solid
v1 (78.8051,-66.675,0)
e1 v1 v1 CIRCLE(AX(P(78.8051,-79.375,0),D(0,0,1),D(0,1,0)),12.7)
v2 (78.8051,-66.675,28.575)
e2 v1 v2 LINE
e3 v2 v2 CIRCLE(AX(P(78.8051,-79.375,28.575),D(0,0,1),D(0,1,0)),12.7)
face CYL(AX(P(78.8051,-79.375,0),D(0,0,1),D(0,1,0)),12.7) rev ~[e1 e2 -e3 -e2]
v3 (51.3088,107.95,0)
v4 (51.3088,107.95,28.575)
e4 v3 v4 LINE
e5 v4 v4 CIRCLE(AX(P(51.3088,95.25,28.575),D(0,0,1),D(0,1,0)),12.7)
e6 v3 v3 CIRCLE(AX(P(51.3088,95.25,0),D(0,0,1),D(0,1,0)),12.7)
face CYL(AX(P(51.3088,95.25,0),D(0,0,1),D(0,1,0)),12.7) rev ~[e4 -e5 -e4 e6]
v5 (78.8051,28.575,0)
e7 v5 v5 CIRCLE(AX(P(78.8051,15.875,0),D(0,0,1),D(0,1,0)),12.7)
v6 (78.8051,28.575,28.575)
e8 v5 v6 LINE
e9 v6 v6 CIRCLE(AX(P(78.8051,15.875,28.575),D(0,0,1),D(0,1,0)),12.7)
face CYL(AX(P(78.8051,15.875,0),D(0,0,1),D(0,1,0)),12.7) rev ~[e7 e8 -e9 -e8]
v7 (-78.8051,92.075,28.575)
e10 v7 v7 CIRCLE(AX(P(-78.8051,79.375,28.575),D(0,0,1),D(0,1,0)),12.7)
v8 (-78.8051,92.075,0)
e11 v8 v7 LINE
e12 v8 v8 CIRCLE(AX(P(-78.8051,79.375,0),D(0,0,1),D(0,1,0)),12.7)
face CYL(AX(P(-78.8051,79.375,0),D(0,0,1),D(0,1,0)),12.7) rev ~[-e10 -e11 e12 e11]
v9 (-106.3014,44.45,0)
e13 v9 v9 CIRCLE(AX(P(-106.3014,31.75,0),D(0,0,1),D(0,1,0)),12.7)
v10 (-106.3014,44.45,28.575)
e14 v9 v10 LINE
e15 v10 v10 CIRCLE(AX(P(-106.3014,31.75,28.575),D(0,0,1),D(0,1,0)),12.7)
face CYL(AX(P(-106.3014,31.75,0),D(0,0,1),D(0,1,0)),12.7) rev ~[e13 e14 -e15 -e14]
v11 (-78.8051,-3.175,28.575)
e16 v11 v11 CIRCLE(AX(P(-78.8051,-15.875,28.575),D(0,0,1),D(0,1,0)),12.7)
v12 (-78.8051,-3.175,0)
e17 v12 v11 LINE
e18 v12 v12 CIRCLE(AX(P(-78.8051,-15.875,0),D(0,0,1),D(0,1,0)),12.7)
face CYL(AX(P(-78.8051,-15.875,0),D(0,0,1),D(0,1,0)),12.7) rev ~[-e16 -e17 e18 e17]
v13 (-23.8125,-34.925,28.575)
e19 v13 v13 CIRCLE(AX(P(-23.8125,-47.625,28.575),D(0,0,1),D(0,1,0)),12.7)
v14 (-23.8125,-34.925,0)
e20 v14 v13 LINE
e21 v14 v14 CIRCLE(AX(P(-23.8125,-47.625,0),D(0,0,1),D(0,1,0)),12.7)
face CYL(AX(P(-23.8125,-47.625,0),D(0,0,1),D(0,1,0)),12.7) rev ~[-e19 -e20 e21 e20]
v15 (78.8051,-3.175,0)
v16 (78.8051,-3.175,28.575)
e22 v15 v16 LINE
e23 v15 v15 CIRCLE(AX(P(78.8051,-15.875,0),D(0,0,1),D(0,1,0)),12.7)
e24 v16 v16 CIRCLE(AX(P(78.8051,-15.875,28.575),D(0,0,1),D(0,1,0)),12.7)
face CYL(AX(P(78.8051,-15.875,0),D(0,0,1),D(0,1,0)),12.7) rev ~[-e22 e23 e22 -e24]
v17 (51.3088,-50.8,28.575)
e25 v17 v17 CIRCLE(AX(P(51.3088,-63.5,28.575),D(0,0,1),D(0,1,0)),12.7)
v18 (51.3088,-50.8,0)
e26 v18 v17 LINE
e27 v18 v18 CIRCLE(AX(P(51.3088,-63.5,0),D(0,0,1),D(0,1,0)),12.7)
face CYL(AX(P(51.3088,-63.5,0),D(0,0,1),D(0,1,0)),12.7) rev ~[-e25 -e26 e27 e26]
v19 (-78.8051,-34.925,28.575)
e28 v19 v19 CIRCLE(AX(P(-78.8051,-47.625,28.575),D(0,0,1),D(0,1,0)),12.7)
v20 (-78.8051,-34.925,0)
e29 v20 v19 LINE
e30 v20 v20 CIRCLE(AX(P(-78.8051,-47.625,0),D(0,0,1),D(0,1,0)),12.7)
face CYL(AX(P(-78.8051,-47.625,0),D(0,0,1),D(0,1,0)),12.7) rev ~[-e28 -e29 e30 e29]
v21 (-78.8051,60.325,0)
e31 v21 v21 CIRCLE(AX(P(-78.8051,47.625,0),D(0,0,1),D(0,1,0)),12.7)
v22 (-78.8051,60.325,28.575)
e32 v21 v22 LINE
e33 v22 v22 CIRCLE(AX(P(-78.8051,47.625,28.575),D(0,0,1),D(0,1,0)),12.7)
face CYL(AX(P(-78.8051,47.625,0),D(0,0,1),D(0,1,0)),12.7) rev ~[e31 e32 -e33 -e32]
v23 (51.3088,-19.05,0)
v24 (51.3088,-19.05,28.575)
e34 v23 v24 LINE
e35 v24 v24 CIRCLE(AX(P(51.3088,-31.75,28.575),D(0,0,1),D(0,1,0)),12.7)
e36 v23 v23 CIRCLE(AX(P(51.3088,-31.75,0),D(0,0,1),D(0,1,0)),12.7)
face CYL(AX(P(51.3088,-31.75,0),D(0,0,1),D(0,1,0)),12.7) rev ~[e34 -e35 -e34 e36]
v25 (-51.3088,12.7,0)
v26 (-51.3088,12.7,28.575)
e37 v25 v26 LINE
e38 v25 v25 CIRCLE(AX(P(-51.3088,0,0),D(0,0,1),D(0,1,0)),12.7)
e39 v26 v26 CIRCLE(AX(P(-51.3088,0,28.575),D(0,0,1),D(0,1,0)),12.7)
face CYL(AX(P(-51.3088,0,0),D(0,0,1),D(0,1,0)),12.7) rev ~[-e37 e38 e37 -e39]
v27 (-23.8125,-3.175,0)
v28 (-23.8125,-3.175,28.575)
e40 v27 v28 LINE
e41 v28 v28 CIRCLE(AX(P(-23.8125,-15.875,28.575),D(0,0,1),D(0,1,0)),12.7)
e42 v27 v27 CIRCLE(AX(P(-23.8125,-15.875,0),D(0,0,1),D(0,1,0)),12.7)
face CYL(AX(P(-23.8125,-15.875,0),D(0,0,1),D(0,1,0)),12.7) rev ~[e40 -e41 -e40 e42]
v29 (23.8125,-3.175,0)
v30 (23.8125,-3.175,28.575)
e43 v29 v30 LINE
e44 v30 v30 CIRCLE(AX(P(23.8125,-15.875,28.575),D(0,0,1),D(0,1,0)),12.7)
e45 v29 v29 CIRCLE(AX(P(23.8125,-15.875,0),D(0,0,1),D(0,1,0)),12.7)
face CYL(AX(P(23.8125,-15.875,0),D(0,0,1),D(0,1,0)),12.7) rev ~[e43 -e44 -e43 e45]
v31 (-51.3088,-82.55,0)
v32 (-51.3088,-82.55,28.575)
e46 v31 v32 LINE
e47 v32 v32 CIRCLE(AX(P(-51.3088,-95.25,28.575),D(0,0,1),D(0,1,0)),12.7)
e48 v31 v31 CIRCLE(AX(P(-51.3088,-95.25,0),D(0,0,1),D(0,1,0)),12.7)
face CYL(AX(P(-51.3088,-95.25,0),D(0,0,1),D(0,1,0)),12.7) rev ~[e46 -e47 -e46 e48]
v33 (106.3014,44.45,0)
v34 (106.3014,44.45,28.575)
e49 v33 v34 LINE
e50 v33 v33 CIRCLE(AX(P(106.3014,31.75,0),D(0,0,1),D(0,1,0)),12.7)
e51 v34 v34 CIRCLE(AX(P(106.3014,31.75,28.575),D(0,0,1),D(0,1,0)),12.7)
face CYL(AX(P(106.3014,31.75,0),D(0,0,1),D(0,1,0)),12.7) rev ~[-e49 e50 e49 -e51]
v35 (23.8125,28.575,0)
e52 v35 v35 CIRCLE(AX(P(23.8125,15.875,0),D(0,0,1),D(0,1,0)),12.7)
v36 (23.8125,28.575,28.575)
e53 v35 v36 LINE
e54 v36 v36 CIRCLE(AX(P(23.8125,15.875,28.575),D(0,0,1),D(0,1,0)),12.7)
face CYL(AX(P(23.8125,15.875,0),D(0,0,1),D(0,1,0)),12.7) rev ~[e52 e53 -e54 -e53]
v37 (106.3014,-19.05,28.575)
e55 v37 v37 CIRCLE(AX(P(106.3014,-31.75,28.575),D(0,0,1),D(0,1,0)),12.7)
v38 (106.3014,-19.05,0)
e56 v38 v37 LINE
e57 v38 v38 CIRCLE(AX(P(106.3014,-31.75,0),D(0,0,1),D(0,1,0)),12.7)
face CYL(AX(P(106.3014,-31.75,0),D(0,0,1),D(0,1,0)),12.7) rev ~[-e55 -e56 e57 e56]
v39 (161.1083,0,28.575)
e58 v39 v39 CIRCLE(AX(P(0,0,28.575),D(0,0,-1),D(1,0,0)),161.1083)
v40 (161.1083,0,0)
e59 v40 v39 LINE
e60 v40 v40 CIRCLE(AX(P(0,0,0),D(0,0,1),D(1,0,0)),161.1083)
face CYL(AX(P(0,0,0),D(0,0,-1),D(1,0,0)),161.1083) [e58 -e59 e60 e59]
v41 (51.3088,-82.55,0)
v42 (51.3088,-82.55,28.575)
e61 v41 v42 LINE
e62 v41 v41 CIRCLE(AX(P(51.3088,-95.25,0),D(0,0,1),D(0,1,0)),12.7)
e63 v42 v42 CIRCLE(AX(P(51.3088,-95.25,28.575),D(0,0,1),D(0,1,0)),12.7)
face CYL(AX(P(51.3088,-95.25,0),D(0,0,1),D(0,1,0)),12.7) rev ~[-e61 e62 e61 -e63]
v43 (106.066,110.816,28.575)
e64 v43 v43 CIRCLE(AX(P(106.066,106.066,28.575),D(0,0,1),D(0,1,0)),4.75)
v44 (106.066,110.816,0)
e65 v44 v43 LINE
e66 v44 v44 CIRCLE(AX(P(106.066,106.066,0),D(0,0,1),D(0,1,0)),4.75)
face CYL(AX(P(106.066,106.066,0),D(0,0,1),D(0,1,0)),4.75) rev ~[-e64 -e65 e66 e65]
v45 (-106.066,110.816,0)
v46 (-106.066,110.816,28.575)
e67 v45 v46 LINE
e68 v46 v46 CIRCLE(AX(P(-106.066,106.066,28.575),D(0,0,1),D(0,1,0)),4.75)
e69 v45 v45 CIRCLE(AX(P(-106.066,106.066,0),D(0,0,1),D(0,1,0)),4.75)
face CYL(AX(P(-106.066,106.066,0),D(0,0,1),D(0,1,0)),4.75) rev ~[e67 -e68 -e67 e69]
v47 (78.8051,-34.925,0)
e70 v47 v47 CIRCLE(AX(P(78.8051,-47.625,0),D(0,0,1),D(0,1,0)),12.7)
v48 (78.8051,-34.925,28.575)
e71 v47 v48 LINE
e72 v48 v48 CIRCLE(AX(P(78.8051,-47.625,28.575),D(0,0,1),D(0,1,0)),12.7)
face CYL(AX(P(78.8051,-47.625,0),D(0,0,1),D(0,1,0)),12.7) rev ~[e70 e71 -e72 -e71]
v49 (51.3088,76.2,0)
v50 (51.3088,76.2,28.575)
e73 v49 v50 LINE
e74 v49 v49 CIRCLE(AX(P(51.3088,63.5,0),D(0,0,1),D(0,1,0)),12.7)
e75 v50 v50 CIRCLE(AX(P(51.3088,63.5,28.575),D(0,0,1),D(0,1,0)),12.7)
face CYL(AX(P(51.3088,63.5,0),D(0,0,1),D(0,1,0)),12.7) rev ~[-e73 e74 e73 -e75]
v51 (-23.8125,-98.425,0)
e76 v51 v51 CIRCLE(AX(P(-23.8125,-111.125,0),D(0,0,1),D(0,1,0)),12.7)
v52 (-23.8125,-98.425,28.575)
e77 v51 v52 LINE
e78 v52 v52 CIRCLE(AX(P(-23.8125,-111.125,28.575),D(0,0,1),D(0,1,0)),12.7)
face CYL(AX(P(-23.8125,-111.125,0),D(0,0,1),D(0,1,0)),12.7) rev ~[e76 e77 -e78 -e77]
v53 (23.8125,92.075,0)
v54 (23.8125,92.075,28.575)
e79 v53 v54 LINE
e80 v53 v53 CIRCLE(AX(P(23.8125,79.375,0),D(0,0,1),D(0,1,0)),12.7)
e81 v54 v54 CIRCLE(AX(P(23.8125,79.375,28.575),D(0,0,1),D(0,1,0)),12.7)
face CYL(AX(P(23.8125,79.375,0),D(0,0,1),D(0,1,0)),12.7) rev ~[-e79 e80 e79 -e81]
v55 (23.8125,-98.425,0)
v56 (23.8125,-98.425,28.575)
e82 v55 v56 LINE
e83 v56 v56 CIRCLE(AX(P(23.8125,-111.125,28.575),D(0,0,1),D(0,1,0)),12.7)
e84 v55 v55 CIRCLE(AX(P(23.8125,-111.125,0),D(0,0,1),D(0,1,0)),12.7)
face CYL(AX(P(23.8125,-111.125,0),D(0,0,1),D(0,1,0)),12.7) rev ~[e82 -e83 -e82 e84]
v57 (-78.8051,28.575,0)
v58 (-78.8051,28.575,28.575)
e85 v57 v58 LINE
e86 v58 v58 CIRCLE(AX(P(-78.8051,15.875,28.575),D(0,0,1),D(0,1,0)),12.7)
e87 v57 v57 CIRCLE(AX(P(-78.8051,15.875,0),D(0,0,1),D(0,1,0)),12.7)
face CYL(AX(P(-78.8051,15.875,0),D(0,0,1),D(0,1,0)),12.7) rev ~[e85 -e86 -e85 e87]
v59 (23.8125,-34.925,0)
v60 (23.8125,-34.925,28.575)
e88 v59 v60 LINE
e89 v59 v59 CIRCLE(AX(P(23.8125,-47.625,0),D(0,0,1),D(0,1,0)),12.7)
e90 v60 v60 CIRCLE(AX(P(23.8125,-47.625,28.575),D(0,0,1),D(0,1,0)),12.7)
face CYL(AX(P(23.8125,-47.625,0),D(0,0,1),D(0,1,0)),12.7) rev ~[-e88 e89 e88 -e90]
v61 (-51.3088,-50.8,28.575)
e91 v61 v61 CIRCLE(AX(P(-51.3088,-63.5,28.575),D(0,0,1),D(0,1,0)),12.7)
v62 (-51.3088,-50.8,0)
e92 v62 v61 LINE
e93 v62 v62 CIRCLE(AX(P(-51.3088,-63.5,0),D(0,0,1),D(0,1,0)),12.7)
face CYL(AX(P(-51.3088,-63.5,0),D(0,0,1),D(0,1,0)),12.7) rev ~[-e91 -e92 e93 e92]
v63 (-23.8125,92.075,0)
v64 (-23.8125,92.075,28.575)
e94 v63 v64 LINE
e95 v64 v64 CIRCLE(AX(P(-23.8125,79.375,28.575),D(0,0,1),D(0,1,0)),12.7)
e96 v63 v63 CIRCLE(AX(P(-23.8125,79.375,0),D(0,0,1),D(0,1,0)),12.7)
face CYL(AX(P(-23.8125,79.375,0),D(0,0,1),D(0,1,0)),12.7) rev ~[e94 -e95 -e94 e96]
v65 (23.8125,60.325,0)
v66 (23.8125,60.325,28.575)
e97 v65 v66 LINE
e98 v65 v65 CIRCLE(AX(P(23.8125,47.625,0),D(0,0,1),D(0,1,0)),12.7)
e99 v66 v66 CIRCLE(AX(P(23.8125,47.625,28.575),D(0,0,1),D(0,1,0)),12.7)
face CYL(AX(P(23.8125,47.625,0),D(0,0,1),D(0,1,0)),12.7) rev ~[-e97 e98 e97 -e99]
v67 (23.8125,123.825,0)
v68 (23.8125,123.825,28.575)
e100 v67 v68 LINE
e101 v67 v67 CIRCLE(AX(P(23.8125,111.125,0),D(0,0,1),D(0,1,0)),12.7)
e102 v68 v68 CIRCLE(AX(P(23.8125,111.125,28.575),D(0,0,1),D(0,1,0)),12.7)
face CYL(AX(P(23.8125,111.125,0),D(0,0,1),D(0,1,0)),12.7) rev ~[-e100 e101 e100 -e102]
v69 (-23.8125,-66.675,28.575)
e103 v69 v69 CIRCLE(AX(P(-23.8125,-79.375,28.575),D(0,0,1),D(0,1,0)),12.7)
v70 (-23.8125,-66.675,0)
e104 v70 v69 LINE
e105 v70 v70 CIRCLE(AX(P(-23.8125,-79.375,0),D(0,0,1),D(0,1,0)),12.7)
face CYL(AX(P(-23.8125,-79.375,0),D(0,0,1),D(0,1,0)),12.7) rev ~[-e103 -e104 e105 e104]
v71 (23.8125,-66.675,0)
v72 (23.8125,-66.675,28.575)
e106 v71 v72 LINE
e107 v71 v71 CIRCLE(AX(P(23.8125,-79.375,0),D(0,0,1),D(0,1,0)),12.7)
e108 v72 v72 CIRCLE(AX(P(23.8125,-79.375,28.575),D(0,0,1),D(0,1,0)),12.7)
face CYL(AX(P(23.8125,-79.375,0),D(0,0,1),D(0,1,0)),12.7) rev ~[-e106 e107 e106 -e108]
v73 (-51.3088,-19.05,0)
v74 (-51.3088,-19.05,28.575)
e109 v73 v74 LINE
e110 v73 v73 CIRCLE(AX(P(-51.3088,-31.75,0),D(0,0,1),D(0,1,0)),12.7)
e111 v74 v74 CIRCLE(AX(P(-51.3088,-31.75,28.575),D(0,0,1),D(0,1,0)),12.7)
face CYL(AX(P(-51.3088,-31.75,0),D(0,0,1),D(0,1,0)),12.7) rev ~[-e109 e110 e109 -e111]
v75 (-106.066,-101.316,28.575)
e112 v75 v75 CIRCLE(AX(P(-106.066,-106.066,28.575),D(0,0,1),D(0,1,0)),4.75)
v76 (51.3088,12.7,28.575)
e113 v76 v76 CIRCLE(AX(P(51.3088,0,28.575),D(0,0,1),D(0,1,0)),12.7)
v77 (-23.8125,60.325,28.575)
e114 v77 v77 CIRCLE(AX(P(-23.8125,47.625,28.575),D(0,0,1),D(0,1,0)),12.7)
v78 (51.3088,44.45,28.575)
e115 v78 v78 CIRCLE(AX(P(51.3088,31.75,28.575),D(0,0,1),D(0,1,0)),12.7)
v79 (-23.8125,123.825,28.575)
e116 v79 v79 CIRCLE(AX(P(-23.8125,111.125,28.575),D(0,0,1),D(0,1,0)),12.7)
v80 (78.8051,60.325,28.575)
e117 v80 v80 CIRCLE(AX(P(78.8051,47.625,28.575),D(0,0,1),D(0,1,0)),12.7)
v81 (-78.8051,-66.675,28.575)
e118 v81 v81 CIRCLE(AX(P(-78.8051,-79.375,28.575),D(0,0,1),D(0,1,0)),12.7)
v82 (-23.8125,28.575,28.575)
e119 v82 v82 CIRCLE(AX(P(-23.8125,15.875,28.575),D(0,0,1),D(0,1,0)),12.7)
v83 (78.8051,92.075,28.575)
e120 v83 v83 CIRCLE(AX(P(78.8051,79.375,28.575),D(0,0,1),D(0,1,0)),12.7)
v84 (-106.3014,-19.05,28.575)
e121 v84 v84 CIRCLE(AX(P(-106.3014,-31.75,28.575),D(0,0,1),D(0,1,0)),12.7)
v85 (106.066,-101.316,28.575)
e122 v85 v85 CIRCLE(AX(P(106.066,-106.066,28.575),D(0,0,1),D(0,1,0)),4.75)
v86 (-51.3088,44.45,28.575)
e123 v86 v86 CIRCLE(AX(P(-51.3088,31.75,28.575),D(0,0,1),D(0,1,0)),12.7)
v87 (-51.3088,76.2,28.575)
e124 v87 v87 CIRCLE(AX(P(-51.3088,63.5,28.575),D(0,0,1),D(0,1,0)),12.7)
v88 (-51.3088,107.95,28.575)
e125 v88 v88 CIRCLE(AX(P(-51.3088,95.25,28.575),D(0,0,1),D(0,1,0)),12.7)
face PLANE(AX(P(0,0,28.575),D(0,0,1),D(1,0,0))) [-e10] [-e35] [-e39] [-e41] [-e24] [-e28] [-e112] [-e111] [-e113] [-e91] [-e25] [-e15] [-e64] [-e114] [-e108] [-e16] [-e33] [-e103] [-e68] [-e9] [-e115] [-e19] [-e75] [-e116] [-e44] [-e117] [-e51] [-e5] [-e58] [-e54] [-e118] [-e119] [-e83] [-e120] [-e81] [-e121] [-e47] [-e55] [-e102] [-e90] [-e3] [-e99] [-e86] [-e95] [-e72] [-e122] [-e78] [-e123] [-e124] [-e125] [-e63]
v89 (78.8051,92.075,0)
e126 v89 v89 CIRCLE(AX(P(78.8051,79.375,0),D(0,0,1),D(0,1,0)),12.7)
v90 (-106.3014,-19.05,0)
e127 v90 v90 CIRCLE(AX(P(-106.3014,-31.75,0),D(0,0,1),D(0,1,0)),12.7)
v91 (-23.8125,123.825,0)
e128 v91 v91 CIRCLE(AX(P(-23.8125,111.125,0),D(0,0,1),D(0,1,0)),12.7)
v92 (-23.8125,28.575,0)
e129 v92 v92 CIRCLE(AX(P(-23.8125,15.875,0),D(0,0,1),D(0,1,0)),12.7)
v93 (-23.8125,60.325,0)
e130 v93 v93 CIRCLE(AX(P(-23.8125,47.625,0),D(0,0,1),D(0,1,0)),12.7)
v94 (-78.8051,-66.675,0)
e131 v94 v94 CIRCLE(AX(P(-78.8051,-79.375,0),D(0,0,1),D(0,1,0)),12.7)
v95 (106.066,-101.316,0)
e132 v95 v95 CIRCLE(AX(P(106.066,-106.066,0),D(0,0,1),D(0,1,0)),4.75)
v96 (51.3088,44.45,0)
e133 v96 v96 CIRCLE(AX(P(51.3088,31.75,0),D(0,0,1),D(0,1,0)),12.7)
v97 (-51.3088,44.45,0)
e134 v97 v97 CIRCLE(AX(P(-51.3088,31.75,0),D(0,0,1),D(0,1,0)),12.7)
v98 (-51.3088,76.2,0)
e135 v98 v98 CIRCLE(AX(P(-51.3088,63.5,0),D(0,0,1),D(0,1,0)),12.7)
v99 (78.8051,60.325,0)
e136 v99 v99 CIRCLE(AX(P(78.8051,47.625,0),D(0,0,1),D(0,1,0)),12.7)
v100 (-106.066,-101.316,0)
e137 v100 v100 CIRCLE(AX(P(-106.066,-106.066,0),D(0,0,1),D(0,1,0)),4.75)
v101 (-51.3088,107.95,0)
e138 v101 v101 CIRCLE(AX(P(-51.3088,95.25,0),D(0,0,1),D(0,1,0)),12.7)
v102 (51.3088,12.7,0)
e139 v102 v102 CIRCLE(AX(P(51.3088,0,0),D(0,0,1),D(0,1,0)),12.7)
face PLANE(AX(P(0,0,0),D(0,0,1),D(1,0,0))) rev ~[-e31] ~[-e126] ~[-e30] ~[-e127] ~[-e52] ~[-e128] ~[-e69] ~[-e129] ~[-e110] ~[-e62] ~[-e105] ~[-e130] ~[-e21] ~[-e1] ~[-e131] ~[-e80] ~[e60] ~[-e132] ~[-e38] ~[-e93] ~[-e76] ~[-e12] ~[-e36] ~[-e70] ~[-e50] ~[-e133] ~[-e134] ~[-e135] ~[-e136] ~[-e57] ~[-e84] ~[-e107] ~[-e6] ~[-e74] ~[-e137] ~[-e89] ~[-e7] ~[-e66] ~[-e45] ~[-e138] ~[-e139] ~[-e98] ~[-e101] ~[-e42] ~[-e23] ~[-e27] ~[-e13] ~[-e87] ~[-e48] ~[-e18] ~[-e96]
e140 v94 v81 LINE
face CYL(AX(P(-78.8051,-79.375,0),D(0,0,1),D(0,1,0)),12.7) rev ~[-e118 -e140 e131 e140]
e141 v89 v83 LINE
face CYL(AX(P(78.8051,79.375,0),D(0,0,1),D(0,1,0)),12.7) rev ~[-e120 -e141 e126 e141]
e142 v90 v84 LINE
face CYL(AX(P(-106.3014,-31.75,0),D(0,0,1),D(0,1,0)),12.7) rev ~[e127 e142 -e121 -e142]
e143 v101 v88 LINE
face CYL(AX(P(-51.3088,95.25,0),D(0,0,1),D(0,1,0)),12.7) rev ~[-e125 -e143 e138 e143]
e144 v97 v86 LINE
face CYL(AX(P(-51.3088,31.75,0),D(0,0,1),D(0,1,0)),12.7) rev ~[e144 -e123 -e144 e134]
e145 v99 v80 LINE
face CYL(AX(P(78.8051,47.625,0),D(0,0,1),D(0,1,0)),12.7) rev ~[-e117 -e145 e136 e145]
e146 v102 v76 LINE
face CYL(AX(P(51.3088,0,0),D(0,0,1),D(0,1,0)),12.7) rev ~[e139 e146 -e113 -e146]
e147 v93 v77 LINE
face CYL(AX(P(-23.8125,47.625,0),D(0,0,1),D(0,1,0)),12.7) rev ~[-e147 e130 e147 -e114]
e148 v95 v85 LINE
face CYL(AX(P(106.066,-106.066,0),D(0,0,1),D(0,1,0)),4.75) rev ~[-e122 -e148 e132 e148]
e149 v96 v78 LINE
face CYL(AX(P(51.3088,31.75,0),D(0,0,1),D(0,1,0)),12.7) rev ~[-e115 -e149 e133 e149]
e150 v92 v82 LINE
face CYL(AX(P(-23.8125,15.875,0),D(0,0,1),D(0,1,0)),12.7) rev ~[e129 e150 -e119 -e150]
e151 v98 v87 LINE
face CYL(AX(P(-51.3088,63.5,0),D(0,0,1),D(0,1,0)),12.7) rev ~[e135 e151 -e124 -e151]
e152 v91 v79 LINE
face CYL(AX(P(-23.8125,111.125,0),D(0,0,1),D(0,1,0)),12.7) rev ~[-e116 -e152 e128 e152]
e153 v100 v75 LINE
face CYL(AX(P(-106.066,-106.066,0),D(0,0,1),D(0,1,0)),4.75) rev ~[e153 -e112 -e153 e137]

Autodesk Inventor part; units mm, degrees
ref_plane "YZ Plane" through (0, 0, 0) normal (1, 0, 0) x (0, 1, 0)
ref_plane "XZ Plane" through (0, 0, 0) normal (0, 1, 0) x (-1, 0, 0)
ref_plane "XY Plane" through (0, 0, 0) normal (0, 0, 1) x (1, 0, 0)
sketch "Sketch1" plane through (0, 0, 0) normal (0, 0, 1) x (1, 0, 0)
  circle A0 centre (0, 0) radius 161.1083
  line L0 (4.75, 161.0382) -> (4.75, -161.0382)
  line L1 (-4.75, -161.0382) -> (-4.75, 161.0382)
  line L2 (0, 0) -> (0, 161.1083) construction
  line L3 (23.8125, 79.375) -> (23.8125, 47.625)
  line L4 (23.8125, 47.625) -> (51.3088, 63.5)
  line L5 (51.3088, 63.5) -> (23.8125, 79.375)
  line L6 (23.8125, 111.125) -> (23.8125, 79.375)
  line L7 (23.8125, 79.375) -> (51.3088, 95.25)
  line L8 (51.3088, 95.25) -> (23.8125, 111.125)
  line L9 (23.8125, 47.625) -> (23.8125, 15.875)
  line L10 (23.8125, 15.875) -> (51.3088, 31.75)
  line L11 (51.3088, 31.75) -> (23.8125, 47.625)
  line L12 (23.8125, 15.875) -> (23.8125, -15.875)
  line L13 (23.8125, -15.875) -> (51.3088, 0)
  line L14 (51.3088, 0) -> (23.8125, 15.875)
  line L15 (23.8125, -15.875) -> (23.8125, -47.625)
  line L16 (23.8125, -47.625) -> (51.3088, -31.75)
  line L17 (51.3088, -31.75) -> (23.8125, -15.875)
  line L18 (23.8125, -47.625) -> (23.8125, -79.375)
  line L19 (23.8125, -79.375) -> (51.3088, -63.5)
  line L20 (51.3088, -63.5) -> (23.8125, -47.625)
  line L21 (23.8125, -79.375) -> (23.8125, -111.125)
  line L22 (23.8125, -111.125) -> (51.3088, -95.25)
  line L23 (51.3088, -95.25) -> (23.8125, -79.375)
  line L24 (51.3088, 95.25) -> (78.8051, 79.375)
  line L25 (78.8051, 79.375) -> (51.3088, 63.5)
  line L26 (51.3088, 63.5) -> (78.8051, 47.625)
  line L27 (78.8051, 47.625) -> (51.3088, 31.75)
  line L28 (51.3088, 31.75) -> (78.8051, 15.875)
  line L29 (78.8051, 15.875) -> (51.3088, 0)
  line L30 (51.3088, 0) -> (78.8051, -15.875)
  line L31 (78.8051, -15.875) -> (51.3088, -31.75)
  line L32 (51.3088, -31.75) -> (78.8051, -47.625)
  line L33 (78.8051, -47.625) -> (51.3088, -63.5)
  line L34 (51.3088, -63.5) -> (78.8051, -79.375)
  line L35 (78.8051, -79.375) -> (51.3088, -95.25)
  line L36 (78.8051, -47.625) -> (106.3014, -31.75)
  line L37 (106.3014, -31.75) -> (78.8051, -15.875)
  line L38 (78.8051, -15.875) -> (106.3014, 0)
  line L39 (106.3014, 0) -> (78.8051, 15.875)
  line L40 (78.8051, 15.875) -> (106.3014, 31.75)
  line L41 (106.3014, 31.75) -> (78.8051, 47.625)
  line L42 (0, 0) -> (106.066, 106.066) construction
  point P0 (23.8125, 0)
  point P1 (78.8051, 79.375)
  dimension "d0" = 322.2165
  dimension "d2" = 9.5
  dimension "d3" = 4.75
  dimension "d4" = 31.75
  dimension "d5" = 31.75
  dimension "d6" = 31.75
  dimension "d7" = 31.75
  dimension "d8" = 31.75
  dimension "d9" = 31.75
  dimension "d10" = 31.75
  dimension "d27" = 23.8125
  dimension "d28" = 150
  dimension "d29" = 45
extrude "Extrusion1" add sketch "Sketch1" along normal blind 28.575 contours A0 L0 | L0 A0 L1 | L1 A0 | L5 L4 L3 | L7 L24 L25 L5 | L6 L8 L7 | L11 L10 L9 | L4 L26 L27 L11 | L14 L13 L12 | L10 L28 L29 L14 | L27 L41 L40 L28 | L17 L16 L15 | L13 L30 L31 L17 | L29 L39 L38 L30 | L20 L19 L18 | L16 L32 L33 L20 | L31 L37 L36 L32 | L23 L22 L21 | L19 L34 L35 L23
hole "Hole2" at (23.8125, 47.625, 0) at (51.3088, 63.5, 0) at (23.8125, 111.125, 0) at (23.8125, 79.375, 0) at (51.3088, 95.25, 0) at (51.3088, 31.75, 0) at (23.8125, 15.875, 0) at (23.8125, -15.875, 0) at (51.3088, 0, 0) at (23.8125, -47.625, 0) at (51.3088, -31.75, 0) at (23.8125, -79.375, 0) at (51.3088, -63.5, 0) at (23.8125, -111.125, 0) at (51.3088, -95.25, 0) at (78.8051, 79.375, 0) at (78.8051, 47.625, 0) at (78.8051, 15.875, 0) at (78.8051, -15.875, 0) at (78.8051, -47.625, 0) at (78.8051, -79.375, 0) at (106.3014, -31.75, 0) at (106.3014, 31.75, 0) direction (0, 0, 1) diameter 25.4 end up to surface
mirror "Mirror1" about plane through (0, 0, 0) normal (1, 0, 0) of "Hole2"
hole "Hole3" at (106.066, 106.066, 0) direction (0, 0, 1) diameter 9.5 end up to surface
pattern_circular "Circular Pattern1" count 4 over 360 about axis through (0, 0, 0) along (0, 0, 1) of "Hole3"
properties part number "Tube Sheet" material "Titanium"
